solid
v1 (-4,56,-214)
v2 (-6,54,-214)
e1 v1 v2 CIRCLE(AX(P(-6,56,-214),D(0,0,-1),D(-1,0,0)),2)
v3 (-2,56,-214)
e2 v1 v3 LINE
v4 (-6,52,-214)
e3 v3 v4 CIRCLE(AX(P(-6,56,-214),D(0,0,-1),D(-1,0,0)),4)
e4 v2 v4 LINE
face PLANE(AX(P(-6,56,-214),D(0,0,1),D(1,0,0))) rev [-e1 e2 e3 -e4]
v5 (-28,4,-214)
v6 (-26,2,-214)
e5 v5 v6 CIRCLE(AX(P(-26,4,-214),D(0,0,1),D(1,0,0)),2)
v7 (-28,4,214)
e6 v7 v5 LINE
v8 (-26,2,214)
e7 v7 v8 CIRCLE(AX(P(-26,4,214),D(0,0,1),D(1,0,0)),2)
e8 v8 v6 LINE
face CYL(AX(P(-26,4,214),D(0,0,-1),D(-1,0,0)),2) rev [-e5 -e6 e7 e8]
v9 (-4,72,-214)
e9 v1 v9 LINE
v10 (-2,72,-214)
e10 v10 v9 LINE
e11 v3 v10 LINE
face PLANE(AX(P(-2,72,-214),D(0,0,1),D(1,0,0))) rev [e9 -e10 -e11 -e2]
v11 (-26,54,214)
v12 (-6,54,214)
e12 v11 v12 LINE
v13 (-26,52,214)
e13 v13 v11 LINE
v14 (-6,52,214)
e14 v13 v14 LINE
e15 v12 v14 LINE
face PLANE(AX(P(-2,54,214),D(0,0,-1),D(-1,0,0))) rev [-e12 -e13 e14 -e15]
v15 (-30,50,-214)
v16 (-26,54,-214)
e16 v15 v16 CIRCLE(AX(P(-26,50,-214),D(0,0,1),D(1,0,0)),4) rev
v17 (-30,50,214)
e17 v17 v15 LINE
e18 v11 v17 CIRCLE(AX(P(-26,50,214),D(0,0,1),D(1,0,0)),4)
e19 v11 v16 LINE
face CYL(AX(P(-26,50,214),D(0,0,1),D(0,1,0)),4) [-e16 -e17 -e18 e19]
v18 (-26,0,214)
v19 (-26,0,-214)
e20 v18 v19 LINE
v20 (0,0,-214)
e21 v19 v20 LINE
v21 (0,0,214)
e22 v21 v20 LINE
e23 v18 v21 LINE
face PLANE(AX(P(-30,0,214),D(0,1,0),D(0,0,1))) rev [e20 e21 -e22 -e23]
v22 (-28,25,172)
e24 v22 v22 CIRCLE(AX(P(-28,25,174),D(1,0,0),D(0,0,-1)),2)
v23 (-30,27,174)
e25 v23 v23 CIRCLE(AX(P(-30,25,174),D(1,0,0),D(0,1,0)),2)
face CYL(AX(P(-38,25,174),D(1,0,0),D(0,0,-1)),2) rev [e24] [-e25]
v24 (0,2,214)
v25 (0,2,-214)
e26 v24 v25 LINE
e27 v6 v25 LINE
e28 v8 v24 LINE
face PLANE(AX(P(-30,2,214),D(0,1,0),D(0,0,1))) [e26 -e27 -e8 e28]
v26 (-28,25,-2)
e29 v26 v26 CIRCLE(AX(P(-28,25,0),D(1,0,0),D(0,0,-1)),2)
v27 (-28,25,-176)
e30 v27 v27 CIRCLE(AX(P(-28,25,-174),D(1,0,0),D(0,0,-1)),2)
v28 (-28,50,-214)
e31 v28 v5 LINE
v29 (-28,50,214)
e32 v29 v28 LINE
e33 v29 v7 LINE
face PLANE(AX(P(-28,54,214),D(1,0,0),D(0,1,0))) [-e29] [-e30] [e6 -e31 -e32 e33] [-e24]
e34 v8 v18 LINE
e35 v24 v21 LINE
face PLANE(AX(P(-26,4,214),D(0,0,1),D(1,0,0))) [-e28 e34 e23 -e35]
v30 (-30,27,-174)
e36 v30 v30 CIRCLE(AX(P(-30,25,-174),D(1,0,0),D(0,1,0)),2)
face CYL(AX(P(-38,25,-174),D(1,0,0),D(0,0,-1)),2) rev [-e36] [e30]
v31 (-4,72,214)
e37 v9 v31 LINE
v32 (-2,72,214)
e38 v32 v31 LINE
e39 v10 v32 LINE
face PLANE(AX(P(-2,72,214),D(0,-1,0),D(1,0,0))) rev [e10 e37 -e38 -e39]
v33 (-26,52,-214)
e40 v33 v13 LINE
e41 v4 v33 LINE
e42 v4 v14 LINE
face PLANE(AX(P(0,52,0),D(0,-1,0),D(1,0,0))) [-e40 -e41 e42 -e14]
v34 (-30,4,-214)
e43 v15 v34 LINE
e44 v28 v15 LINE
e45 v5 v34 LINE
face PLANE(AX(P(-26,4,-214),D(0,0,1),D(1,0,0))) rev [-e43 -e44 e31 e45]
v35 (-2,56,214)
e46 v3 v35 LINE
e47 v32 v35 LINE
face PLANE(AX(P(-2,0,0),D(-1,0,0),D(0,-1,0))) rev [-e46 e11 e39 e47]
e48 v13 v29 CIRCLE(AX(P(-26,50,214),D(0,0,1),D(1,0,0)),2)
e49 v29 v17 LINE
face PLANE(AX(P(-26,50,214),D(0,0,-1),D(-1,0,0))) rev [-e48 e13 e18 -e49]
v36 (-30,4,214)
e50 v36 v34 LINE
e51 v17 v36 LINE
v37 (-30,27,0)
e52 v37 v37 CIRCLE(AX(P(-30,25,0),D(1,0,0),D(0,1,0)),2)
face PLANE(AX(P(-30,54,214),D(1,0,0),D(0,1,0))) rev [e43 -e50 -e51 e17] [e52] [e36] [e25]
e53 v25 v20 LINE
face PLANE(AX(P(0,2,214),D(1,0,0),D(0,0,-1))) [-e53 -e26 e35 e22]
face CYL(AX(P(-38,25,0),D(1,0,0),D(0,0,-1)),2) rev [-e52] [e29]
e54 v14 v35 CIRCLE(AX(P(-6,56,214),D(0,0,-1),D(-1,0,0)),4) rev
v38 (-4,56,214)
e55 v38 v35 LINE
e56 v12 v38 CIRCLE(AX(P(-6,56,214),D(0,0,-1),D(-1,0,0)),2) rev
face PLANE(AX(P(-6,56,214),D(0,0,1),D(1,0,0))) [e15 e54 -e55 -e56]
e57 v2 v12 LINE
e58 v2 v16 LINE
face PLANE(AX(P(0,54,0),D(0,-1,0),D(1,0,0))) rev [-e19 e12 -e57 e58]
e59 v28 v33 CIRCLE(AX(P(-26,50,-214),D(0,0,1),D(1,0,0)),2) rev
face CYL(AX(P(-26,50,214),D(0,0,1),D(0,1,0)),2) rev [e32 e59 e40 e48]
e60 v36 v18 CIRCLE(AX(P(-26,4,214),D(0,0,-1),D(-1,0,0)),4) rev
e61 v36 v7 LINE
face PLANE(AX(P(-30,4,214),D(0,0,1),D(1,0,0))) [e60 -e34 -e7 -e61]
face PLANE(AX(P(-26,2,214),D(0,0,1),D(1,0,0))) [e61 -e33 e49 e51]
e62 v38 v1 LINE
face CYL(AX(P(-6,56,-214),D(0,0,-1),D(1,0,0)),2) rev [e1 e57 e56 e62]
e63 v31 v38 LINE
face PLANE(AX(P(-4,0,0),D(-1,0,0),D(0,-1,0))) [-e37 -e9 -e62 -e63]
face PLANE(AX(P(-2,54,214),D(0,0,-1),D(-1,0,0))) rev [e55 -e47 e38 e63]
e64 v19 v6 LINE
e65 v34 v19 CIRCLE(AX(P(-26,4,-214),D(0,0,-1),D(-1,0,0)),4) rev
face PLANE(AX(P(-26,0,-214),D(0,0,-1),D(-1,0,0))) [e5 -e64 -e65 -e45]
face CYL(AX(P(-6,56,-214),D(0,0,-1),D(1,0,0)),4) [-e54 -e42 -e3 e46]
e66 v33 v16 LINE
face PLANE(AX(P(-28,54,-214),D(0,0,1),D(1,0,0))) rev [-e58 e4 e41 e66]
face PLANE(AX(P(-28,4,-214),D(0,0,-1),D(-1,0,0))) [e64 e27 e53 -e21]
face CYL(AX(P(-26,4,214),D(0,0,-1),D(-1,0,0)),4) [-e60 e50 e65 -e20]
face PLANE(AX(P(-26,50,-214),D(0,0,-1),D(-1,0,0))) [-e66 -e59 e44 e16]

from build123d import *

# Parameters (mm, degrees)
BASE_FLANGE1_DEPTH           = 214
EDGE_FLANGE1_STRIP_W         = 12
EDGE_FLANGE1_STRIP_H         = 2
EDGE_FLANGE1_STRIP_CUT_DEPTH = 428
EDGE_FLANGE1_DEPTH           = 428
EDGE_FLANGE2_STRIP_W         = 12
EDGE_FLANGE2_STRIP_H         = 2
EDGE_FLANGE2_STRIP_CUT_DEPTH = 428
EDGE_FLANGE2_DEPTH           = 428
SKETCH6_R                    = 2
CUT_EXTRUDE2_DEPTH           = 10
LPATTERN3_COUNT              = 3
LPATTERN3_PITCH              = 174


# Sheet-metal steps are written as plain solids
with BuildPart() as part:
    # Sketch2 → Base-Flange1 (new, symmetric)
    with BuildSketch(Plane.XY):
        with BuildLine():
            Line((-30, 54), (-30, 4))
            ThreePointArc((-30, 4), (-28.828427125, 1.171572875), (-26, 0))
            Line((-26, 0), (0, 0))
            Line((0, 0), (0, 2))
            Line((0, 2), (-26, 2))
            ThreePointArc((-26, 2), (-27.414213562, 2.585786438), (-28, 4))
            Line((-28, 4), (-28, 54))
            Line((-28, 54), (-30, 54))
        make_face()
    extrude(amount=BASE_FLANGE1_DEPTH, both=True)

    # Edge-Flange1 strip (across the edge) → Edge-Flange1 strip cut (cut)
    with BuildSketch(Plane(origin=(-28, 54, -214), x_dir=(0, -1, 0), z_dir=(0, 0, 1))):
        with Locations((-2, -1)):
            Rectangle(EDGE_FLANGE1_STRIP_W, EDGE_FLANGE1_STRIP_H)
    extrude(amount=EDGE_FLANGE1_STRIP_CUT_DEPTH, mode=Mode.SUBTRACT)

    # Edge-Flange1 section (across the edge) → Edge-Flange1 (add)
    with BuildSketch(Plane(origin=(-28, 54, -214), x_dir=(0, -1, 0), z_dir=(0, 0, 1))):
        with BuildLine():
            Line((0, 2), (0, 26))
            Line((0, 26), (2, 26))
            Line((2, 26), (2, 2))
            ThreePointArc((2, 2), (2.585786438, 0.585786438), (4, 0))
            Line((4, 0), (4, -2))
            ThreePointArc((4, -2), (1.171572875, -0.828427125), (0, 2))
        make_face()
    extrude(amount=EDGE_FLANGE1_DEPTH)

    # Edge-Flange2 strip (across the edge) → Edge-Flange2 strip cut (cut)
    with BuildSketch(Plane(origin=(-2, 54, 214), x_dir=(-1, 0, 0), z_dir=(0, 0, -1))):
        with Locations((-2, -1)):
            Rectangle(EDGE_FLANGE2_STRIP_W, EDGE_FLANGE2_STRIP_H)
    extrude(amount=EDGE_FLANGE2_STRIP_CUT_DEPTH, mode=Mode.SUBTRACT)

    # Edge-Flange2 section (across the edge) → Edge-Flange2 (add)
    with BuildSketch(Plane(origin=(-2, 54, 214), x_dir=(-1, 0, 0), z_dir=(0, 0, -1))):
        with BuildLine():
            Line((0, 2), (0, 18))
            Line((0, 18), (2, 18))
            Line((2, 18), (2, 2))
            ThreePointArc((2, 2), (2.585786438, 0.585786438), (4, 0))
            Line((4, 0), (4, -2))
            ThreePointArc((4, -2), (1.171572875, -0.828427125), (0, 2))
        make_face()
    extrude(amount=EDGE_FLANGE2_DEPTH)

    # Sketch6 → Cut-Extrude2 (cut)
    with BuildSketch(Plane(origin=(-28, 0, 0), x_dir=(0, 0, -1), z_dir=(1, 0, 0))):
        with Locations((174, 25)):
            Circle(SKETCH6_R)
    cut_extrude2 = extrude(amount=-CUT_EXTRUDE2_DEPTH, mode=Mode.SUBTRACT)

    # LPattern3: Cut-Extrude2 ×3
    with Locations(*[(0, 0, i * LPATTERN3_PITCH) for i in range(1, LPATTERN3_COUNT)]):
        add(cut_extrude2, mode=Mode.SUBTRACT)


solid = part.part
